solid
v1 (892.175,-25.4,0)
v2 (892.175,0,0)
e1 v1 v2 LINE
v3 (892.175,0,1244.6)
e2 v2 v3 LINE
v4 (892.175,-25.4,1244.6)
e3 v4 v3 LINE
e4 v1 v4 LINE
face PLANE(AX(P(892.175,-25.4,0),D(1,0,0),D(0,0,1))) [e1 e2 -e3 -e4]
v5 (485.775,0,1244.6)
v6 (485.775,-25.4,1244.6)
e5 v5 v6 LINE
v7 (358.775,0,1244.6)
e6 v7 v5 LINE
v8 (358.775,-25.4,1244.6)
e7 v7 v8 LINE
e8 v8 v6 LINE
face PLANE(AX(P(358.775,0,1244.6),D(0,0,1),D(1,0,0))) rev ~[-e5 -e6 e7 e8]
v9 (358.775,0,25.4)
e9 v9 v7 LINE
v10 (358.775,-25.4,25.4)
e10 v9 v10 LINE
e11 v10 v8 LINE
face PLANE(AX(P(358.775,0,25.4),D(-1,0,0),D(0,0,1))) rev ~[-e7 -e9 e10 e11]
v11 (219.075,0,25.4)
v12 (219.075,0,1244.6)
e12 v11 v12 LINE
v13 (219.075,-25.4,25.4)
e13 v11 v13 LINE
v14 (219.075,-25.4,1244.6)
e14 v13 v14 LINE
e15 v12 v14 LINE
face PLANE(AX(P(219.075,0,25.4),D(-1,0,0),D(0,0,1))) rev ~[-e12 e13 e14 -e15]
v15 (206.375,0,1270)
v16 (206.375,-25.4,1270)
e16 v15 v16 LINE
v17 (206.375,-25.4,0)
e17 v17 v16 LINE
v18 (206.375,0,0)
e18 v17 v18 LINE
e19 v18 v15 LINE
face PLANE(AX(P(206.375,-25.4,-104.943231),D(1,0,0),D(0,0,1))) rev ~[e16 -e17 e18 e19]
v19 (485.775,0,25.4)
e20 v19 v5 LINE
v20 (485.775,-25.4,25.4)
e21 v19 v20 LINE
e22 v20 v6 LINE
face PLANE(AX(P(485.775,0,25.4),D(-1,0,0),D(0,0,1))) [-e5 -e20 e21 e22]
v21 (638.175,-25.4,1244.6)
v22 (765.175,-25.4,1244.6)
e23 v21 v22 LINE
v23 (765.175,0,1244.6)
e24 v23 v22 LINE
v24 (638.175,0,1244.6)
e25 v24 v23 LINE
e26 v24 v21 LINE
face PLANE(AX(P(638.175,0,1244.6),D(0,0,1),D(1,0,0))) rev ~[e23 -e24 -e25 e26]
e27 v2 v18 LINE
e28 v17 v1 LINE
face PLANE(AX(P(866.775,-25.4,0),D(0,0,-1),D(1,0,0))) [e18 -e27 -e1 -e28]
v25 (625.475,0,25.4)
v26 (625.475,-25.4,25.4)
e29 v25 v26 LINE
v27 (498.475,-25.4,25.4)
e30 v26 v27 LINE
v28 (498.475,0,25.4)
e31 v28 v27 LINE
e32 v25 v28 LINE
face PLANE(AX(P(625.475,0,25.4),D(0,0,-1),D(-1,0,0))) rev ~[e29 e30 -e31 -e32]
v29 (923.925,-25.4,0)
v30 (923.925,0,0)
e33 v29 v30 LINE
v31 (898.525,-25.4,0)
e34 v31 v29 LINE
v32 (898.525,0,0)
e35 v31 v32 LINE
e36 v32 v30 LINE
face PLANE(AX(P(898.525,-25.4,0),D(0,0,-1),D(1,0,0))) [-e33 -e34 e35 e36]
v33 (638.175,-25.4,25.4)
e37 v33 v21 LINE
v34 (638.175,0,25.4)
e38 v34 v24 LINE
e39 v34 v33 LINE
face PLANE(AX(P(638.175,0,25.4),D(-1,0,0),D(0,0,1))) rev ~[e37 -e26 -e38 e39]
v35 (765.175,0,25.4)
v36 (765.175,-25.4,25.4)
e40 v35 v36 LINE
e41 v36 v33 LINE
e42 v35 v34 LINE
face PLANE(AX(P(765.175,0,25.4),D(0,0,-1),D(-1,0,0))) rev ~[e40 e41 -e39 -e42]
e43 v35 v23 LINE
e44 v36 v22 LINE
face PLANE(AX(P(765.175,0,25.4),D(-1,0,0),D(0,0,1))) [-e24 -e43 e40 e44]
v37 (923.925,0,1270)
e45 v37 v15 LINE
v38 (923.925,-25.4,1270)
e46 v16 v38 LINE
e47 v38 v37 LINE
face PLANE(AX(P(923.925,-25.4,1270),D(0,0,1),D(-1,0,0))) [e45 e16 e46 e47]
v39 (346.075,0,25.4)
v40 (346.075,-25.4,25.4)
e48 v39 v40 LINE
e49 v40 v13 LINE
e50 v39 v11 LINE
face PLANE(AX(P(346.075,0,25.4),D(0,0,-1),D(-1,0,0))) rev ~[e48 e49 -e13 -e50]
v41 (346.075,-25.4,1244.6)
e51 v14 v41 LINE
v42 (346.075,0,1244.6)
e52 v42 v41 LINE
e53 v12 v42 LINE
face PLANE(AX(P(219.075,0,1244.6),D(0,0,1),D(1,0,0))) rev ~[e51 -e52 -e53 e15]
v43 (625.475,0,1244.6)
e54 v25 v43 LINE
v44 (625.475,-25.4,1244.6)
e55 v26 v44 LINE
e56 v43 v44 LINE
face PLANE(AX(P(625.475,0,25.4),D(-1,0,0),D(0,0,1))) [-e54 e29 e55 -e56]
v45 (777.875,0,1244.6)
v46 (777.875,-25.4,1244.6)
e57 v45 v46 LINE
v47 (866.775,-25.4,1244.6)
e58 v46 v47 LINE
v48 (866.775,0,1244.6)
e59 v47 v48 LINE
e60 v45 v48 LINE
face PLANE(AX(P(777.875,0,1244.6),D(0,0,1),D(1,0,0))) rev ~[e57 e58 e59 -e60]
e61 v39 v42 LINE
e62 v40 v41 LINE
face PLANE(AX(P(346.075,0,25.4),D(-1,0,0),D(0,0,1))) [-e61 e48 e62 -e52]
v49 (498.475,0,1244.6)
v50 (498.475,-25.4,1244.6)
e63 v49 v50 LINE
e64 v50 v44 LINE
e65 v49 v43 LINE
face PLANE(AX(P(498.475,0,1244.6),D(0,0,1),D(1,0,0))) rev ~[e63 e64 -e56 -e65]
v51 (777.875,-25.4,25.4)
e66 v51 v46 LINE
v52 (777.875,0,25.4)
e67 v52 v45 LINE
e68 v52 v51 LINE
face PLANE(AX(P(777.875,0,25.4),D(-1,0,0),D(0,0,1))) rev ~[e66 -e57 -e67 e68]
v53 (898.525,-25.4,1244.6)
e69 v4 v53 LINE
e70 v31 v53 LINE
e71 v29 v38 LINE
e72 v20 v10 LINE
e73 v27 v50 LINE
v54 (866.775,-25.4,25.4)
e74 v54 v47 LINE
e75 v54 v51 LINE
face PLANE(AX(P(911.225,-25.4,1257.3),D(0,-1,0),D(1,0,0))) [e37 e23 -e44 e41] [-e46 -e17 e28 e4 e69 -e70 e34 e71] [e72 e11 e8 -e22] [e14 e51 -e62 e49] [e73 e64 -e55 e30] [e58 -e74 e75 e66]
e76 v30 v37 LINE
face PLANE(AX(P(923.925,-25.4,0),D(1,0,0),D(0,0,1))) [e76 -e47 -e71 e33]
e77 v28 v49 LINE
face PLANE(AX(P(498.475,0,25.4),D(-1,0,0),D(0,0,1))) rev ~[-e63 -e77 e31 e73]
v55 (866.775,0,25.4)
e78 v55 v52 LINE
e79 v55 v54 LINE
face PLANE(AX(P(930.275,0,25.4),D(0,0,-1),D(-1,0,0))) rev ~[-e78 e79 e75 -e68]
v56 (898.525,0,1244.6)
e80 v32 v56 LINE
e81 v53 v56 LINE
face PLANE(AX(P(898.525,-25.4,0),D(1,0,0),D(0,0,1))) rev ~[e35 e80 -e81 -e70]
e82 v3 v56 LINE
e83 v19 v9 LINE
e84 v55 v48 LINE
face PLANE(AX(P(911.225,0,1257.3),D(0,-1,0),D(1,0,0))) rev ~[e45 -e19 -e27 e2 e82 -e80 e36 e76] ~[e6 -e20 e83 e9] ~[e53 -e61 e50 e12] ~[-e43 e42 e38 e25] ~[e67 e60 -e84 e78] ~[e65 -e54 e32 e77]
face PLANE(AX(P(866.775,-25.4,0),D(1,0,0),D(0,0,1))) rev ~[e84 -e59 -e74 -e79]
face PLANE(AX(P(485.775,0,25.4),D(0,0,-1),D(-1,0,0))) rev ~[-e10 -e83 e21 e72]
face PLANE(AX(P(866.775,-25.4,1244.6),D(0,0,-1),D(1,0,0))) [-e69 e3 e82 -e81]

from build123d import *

# Parameters (mm, degrees)
F0_W      = 12.7
F0_H      = 1219.2
F1_DEPTH  = 25.4
F2_W      = 406.4
F2_H      = 1396.9661742449
F2_W_2    = 69.85
F2_H_2    = 1270
F2_W_3    = 63.5
F3_DEPTH  = 25.4
F4_W      = 25.4
F4_H      = 1270
F5_DEPTH  = 25.4
F6_W      = 25.4
F6_H      = 1270
F7_DEPTH  = 25.4
F6_H_2    = 25.4
F6_W_2    = 31.75
F6_H_3    = 1244.6
F9_W      = 975.7457971573
F9_H      = 1423.7642139196
F10_DEPTH = 218.67692


with BuildPart() as f1:
    # F0 (on Front) → F1 (new body)
    with BuildSketch(Plane.XZ):
        Polygon((-930.275, 1270), (-930.275, 1244.6), (-771.525, 1244.6), (-758.825, 1244.6), (-631.825, 1244.6), (-619.125, 1244.6), (-492.125, 1244.6), (-479.425, 1244.6), (-352.425, 1244.6), (-339.725, 1244.6), (-212.725, 1244.6), (-200.025, 1244.6), (-73.025, 1244.6), (-60.325, 1244.6), (66.675, 1244.6), (79.375, 1244.6), (206.375, 1244.6), (219.075, 1244.6), (346.075, 1244.6), (358.775, 1244.6), (485.775, 1244.6), (498.475, 1244.6), (625.475, 1244.6), (638.175, 1244.6), (765.175, 1244.6), (777.875, 1244.6), (930.275, 1244.6), (930.275, 1270), align=None)
        with Locations((-765.175, 635)):
            Rectangle(F0_W, F0_H)
        Polygon((-758.825, 25.4), (-771.525, 25.4), (-930.275, 25.4), (-930.275, 0), (930.275, 0), (930.275, 25.4), (777.875, 25.4), (765.175, 25.4), (638.175, 25.4), (625.475, 25.4), (498.475, 25.4), (485.775, 25.4), (358.775, 25.4), (346.075, 25.4), (219.075, 25.4), (206.375, 25.4), (79.375, 25.4), (66.675, 25.4), (-60.325, 25.4), (-73.025, 25.4), (-200.025, 25.4), (-212.725, 25.4), (-339.725, 25.4), (-352.425, 25.4), (-479.425, 25.4), (-492.125, 25.4), (-619.125, 25.4), (-631.825, 25.4), align=None)
        with Locations((771.525, 635)):
            Rectangle(F0_W, F0_H)
        with Locations((-625.475, 635)):
            Rectangle(F0_W, F0_H)
        with Locations((-485.775, 635)):
            Rectangle(F0_W, F0_H)
        with Locations((-346.075, 635)):
            Rectangle(F0_W, F0_H)
        with Locations((-206.375, 635)):
            Rectangle(F0_W, F0_H)
        with Locations((-66.675, 635)):
            Rectangle(F0_W, F0_H)
        with Locations((73.025, 635)):
            Rectangle(F0_W, F0_H)
        with Locations((212.725, 635)):
            Rectangle(F0_W, F0_H)
        with Locations((352.425, 635)):
            Rectangle(F0_W, F0_H)
        with Locations((492.125, 635)):
            Rectangle(F0_W, F0_H)
        with Locations((631.825, 635)):
            Rectangle(F0_W, F0_H)
    extrude(amount=F1_DEPTH)

    # F2 (on face) → F3 (cut)
    with BuildSketch(Plane.XZ.offset(25.4)):
        with Locations((3.175, 593.5398563743)):
            Rectangle(F2_W, F2_H)
        with Locations((-895.35, 635)):
            Rectangle(F2_W_2, F2_H_2)
        with Locations((898.525, 635)):
            Rectangle(F2_W_3, F2_H_2)
    extrude(amount=-F3_DEPTH, mode=Mode.SUBTRACT)

    # F4 (on face) → F5, piece 2 (join)
    with BuildSketch(Plane.XZ.offset(25.4)):
        with Locations((879.475, 635)):
            Rectangle(F4_W, F4_H)
    extrude(amount=-F5_DEPTH)

    # F6 (on face) → F7, piece 2 (join)
    with BuildSketch(Plane.XZ.offset(25.4)):
        with Locations((911.225, 1257.3)):
            Rectangle(F6_W, F6_H_2)
        with Locations((882.65, 1257.3)):
            Rectangle(F6_W_2, F6_H_2)
        with Locations((911.225, 622.3)):
            Rectangle(F6_W, F6_H_3)
    extrude(amount=-F7_DEPTH)

    # F8: union 


with BuildPart() as f5:
    # F4 (on face) → F5 (new body)
    with BuildSketch(Plane.XZ.offset(25.4)):
        with Locations((-873.125, 635)):
            Rectangle(F4_W, F4_H)
    extrude(amount=-F5_DEPTH)


with BuildPart() as f7:
    # F6 (on face) → F7 (new body)
    with BuildSketch(Plane.XZ.offset(25.4)):
        with Locations((-904.875, 635)):
            Rectangle(F6_W, F6_H)
    extrude(amount=-F7_DEPTH)


with BuildPart() as f10_tool:
    # F9 (on face) → F10 (new body)
    with BuildSketch(Plane(origin=(0, 0, 0), x_dir=(-1, 0, 0), z_dir=(0, 1, 0))):
        with Locations((666.6726469994, 601.2135818601)):
            Rectangle(F9_W, F9_H)
    extrude(amount=-F10_DEPTH)


with BuildPart() as f1_1:
    add(f1.part)

    # F10: cut by f10_tool
    add(f10_tool.part, mode=Mode.SUBTRACT)


with BuildPart() as f5_1:
    add(f5.part)

    # F10: cut by f10_tool
    add(f10_tool.part, mode=Mode.SUBTRACT)


with BuildPart() as f7_1:
    add(f7.part)

    # F10: cut by f10_tool
    add(f10_tool.part, mode=Mode.SUBTRACT)


solid = f1_1.part
